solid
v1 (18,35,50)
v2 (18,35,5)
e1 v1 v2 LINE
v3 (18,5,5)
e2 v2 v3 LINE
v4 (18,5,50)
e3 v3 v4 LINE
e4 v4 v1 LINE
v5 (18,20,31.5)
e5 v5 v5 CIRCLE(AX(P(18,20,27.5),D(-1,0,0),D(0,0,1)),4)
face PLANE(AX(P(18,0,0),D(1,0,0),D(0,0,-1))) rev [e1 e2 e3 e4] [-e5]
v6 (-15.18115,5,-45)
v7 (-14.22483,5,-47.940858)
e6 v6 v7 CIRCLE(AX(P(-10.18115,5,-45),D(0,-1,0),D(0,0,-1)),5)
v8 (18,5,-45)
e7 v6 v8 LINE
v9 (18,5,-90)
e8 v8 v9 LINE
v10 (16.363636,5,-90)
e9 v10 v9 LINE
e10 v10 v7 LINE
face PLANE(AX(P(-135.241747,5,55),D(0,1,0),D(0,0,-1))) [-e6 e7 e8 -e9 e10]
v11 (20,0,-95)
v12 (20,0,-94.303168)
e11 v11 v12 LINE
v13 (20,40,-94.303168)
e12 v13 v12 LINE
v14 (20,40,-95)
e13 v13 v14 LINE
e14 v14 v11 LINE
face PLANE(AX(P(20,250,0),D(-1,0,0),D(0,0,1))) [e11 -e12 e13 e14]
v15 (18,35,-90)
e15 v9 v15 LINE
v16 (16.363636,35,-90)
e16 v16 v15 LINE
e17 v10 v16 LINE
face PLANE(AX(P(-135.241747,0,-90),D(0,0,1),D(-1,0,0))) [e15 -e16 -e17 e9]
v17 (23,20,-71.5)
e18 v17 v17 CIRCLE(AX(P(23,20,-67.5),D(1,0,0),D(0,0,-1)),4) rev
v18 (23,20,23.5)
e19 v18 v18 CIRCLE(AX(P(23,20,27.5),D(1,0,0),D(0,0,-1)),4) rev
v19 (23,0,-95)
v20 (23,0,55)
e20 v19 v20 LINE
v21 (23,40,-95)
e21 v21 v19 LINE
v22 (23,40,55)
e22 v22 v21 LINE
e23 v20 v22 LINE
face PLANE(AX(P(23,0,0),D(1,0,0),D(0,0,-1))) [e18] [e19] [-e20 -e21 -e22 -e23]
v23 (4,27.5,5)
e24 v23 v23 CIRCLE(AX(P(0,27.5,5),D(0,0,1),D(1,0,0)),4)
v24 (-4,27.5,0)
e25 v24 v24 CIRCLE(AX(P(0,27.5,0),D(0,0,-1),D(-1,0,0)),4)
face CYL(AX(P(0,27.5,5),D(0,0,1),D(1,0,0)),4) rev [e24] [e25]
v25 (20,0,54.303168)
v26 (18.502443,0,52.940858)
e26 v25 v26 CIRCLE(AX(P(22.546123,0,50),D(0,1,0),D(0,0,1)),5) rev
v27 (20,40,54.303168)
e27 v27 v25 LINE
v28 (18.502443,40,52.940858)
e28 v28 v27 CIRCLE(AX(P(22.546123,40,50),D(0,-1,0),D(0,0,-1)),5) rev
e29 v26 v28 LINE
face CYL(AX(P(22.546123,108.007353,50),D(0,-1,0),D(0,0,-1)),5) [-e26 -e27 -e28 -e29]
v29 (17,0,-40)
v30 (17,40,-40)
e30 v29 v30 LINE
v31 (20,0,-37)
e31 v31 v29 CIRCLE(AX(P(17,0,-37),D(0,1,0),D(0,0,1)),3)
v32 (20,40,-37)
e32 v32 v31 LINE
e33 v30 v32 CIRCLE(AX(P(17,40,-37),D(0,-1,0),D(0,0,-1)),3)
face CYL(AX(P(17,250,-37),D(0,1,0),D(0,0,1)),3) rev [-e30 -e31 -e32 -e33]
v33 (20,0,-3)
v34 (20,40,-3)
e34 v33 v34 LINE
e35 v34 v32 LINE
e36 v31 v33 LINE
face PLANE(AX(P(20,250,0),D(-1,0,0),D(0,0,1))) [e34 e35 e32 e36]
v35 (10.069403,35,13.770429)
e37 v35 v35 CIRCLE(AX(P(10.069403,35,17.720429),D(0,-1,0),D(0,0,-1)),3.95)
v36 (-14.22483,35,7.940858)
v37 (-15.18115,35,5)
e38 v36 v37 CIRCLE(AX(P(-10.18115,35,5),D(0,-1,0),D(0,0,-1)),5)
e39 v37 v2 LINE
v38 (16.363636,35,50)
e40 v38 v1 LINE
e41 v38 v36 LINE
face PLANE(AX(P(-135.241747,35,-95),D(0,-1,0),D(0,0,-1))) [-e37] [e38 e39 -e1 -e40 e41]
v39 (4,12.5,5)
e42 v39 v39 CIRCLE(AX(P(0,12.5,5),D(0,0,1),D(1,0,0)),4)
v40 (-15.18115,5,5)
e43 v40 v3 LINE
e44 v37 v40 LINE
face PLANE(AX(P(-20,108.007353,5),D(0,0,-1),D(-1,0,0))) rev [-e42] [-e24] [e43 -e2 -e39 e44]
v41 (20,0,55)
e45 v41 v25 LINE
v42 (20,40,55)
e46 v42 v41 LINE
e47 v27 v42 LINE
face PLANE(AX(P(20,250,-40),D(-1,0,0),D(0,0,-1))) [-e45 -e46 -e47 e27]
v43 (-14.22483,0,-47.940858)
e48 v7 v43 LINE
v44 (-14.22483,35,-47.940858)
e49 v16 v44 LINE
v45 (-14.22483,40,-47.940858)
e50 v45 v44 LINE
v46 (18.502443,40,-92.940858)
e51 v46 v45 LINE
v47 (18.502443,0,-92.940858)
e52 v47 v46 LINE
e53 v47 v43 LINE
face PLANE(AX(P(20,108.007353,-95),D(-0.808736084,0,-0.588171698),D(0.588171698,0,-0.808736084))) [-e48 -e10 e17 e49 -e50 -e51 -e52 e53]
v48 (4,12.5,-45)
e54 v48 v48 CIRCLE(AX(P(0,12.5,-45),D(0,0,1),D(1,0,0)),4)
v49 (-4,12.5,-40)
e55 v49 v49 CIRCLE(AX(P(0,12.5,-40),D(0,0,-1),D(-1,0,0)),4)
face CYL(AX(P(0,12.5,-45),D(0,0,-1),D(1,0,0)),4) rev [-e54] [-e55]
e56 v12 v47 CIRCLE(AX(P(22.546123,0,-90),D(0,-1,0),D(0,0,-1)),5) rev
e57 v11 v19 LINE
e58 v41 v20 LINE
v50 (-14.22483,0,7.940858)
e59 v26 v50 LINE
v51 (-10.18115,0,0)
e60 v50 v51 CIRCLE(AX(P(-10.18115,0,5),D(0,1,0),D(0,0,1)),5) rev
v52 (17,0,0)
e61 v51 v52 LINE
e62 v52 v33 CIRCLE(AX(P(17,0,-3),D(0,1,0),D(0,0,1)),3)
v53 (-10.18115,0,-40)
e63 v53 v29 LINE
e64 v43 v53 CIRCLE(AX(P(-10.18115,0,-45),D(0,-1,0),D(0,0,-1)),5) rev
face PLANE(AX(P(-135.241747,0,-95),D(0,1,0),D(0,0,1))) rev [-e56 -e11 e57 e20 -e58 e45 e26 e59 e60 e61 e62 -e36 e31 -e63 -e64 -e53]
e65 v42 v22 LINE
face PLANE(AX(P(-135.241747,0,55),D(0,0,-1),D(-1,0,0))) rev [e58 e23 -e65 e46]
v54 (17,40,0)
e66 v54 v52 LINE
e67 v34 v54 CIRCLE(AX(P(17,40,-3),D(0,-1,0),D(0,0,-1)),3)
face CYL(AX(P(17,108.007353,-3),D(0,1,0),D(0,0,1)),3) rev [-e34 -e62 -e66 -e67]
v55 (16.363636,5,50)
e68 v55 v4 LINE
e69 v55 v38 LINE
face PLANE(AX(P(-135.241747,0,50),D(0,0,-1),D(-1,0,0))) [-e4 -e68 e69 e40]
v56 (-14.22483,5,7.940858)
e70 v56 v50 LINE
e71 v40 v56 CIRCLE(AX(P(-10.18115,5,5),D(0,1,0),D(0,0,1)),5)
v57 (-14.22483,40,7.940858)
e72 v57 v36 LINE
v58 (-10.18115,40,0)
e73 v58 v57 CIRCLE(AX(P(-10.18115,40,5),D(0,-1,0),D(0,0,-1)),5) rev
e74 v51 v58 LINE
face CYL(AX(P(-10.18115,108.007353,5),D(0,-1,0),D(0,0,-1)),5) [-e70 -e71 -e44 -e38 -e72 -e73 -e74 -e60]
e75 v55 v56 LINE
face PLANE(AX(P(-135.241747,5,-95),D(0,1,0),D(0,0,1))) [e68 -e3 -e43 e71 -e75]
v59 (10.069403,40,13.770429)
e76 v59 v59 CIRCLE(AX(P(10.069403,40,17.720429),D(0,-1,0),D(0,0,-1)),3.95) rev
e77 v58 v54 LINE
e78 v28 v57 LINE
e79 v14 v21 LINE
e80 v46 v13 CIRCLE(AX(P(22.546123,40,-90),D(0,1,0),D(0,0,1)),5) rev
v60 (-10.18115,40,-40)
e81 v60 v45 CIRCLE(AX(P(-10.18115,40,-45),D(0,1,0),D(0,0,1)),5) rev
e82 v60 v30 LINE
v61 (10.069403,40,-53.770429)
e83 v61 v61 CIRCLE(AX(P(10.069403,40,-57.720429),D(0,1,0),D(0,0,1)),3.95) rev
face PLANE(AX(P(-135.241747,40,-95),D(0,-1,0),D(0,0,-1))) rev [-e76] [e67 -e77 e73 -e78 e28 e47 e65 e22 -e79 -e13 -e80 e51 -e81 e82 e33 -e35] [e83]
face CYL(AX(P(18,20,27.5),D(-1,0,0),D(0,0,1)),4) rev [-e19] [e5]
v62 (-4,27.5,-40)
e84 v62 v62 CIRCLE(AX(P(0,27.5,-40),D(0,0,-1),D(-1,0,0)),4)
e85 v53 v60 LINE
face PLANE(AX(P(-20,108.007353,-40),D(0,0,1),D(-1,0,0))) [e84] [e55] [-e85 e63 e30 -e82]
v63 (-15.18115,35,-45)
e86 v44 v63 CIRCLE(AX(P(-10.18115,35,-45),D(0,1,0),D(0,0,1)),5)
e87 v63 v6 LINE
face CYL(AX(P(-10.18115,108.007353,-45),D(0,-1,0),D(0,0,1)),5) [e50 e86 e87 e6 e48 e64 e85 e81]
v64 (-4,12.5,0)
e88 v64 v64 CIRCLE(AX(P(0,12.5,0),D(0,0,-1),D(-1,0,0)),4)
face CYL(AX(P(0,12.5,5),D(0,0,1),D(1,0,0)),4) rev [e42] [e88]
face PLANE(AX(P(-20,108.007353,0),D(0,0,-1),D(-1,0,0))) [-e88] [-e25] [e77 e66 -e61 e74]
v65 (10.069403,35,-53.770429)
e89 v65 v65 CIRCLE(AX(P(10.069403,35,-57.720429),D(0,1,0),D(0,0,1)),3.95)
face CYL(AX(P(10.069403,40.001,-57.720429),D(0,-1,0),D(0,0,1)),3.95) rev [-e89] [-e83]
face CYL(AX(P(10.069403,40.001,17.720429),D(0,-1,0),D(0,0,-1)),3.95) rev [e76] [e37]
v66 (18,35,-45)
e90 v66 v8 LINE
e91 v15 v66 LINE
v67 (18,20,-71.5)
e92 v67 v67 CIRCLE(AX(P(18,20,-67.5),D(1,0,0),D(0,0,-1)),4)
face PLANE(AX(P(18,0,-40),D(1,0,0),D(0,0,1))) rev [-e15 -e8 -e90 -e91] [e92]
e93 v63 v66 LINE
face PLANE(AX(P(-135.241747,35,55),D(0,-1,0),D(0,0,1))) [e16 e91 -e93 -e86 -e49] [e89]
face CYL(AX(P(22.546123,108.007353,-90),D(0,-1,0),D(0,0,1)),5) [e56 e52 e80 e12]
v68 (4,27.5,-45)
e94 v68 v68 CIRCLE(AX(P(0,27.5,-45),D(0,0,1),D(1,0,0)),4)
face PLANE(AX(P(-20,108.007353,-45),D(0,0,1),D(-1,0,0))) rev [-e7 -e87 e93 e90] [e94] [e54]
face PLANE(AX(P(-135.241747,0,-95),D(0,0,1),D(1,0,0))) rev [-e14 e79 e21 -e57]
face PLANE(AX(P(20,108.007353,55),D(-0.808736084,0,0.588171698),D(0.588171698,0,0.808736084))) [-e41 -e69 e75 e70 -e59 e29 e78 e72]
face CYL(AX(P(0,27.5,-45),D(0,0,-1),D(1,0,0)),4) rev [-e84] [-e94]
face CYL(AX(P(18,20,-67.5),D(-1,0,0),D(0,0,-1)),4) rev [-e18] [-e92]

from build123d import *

# Parameters (mm, degrees)
SKETCH2_W                 = 150
SKETCH2_H                 = 40
BOSS_EXTRUDE1_DEPTH       = 3
BOSS_EXTRUDE2_DEPTH       = 40
SHELL3_T                  = -5
FILLET2_R                 = 5
F_8_0MM_DOWEL_HOLE1_D     = 8
F_8_0MM_DOWEL_HOLE2_D     = 8
F_8_0MM_DOWEL_HOLE2_DEPTH = 5
F_8_0MM_DOWEL_HOLE2_TIP   = 2.403442476
CUT_EXTRUDE1_REACH        = 105.822
SKETCH8_R                 = 3.95
FILLET3_R                 = 3
CUT_EXTRUDE2_REACH        = 110.916
SKETCH9_R                 = 4


with BuildPart() as part:
    # Sketch2 → Boss-Extrude1 (new body)
    with BuildSketch(Plane.ZY.offset(-23)):
        with Locations((-20, 20)):
            Rectangle(SKETCH2_W, SKETCH2_H)
    extrude(amount=BOSS_EXTRUDE1_DEPTH)

    # Sketch3 → Boss-Extrude2 (add)
    with BuildSketch(Plane.XZ):
        Polygon((20, 55), (-20, 0), (20, 0), align=None)
    extrude(amount=-BOSS_EXTRUDE2_DEPTH)

    # Shell3
    shell3_openings = [part.faces().sort_by_distance(p)[0] for p in [
        (0, 20, 27.5),
    ]]
    offset(amount=SHELL3_T, openings=shell3_openings, kind=Kind.INTERSECTION)

    # Fillet2
    # the kernel refuses this fillet: 5 mm, written as the material it takes off along each edge
    with BuildSketch(Plane(origin=(20, -6.365307396, 55), x_dir=(1, 0, 0), z_dir=(0, 1, 0))) as fillet2_piece_1:
        with BuildLine():
            CenterArc((FILLET2_R * 0.509224591703, FILLET2_R), FILLET2_R, 216.027373385, 53.972626615)
            Line((-FILLET2_R * 0.2995114926, FILLET2_R * 0.411828302325), (0, 0))
            Line((0, 0), (FILLET2_R * 0.509224591703, 0))
        make_face()
    extrude(amount=52.730614793, mode=Mode.SUBTRACT)
    with BuildSketch(Plane(origin=(-20, -24.547125578, 0), x_dir=(1, 0, 0), z_dir=(0, 1, 0))) as fillet2_piece_2:
        with BuildLine():
            CenterArc((FILLET2_R * 1.96377004625, -FILLET2_R), FILLET2_R, 90, 126.027373385)
            Line((FILLET2_R * 1.15503396195, -FILLET2_R * 1.58817169768), (0, 0))
            Line((0, 0), (FILLET2_R * 1.96377004625, 0))
        make_face()
    extrude(amount=89.094251156, mode=Mode.SUBTRACT)

    # Ø8.0mm Dowel Hole1 (through all)
    with Locations(Plane.XY.offset(5)):
        with Locations((0, 12.5), (0, 27.5)):
            Hole(F_8_0MM_DOWEL_HOLE1_D / 2)

    # Ø8.0mm Dowel Hole2
    with Locations(Plane.ZY.offset(-18)):
        with Locations((27.5, 20)):
            Hole(F_8_0MM_DOWEL_HOLE2_D / 2, depth=F_8_0MM_DOWEL_HOLE2_DEPTH)
            with Locations((0, 0, -(F_8_0MM_DOWEL_HOLE2_DEPTH + F_8_0MM_DOWEL_HOLE2_TIP / 2))):  # 118° drill point
                Cone(0, F_8_0MM_DOWEL_HOLE2_D / 2, F_8_0MM_DOWEL_HOLE2_TIP, mode=Mode.SUBTRACT)

    # Sketch8 → Cut-Extrude1 (cut, up to next)
    with BuildSketch(Plane.XZ.offset(-35), mode=Mode.PRIVATE) as cut_extrude1_sk1:
        with Locations(Location((10.069403087, 17.720429244, 0), (0, 0, 270))):
            Circle(SKETCH8_R)
    cut_extrude1_tool1 = extrude(cut_extrude1_sk1.sketch, amount=-CUT_EXTRUDE1_REACH, mode=Mode.PRIVATE) & part.part
    add(cut_extrude1_tool1.solids().sort_by_distance((10.069403, 35, 17.720429))[0], mode=Mode.SUBTRACT)

    # Mirror2: part across plane


with BuildPart() as part_1:
    add(part.part)
    add(part.part.mirror(Plane.XY.offset(-20)))

    # Fillet3
    fillet3_edges = [part_1.edges().sort_by_distance(p)[0] for p in [
        (20, 20, 0),
        (20, 20, -40),
    ]]
    fillet(fillet3_edges, radius=FILLET3_R)

    # Sketch9 → Cut-Extrude2 (cut, up to next)
    with BuildSketch(Plane.ZY.offset(-20), mode=Mode.PRIVATE) as cut_extrude2_sk1:
        with Locations((27.5, 20)):
            Circle(SKETCH9_R)
    cut_extrude2_tool1 = extrude(cut_extrude2_sk1.sketch, amount=-CUT_EXTRUDE2_REACH, mode=Mode.PRIVATE) & part_1.part
    # Sketch9 → Cut-Extrude2 (cut, up to next)
    with BuildSketch(Plane.ZY.offset(-20), mode=Mode.PRIVATE) as cut_extrude2_sk2:
        with Locations(Location((-67.5, 20, 0), (0, 0, 180))):
            Circle(SKETCH9_R)
    cut_extrude2_tool2 = extrude(cut_extrude2_sk2.sketch, amount=-CUT_EXTRUDE2_REACH, mode=Mode.PRIVATE) & part_1.part
    add(cut_extrude2_tool1.solids().sort_by_distance((20, 20, 27.5))[0], mode=Mode.SUBTRACT)
    add(cut_extrude2_tool2.solids().sort_by_distance((20, 20, -67.5))[0], mode=Mode.SUBTRACT)


solid = part_1.part
